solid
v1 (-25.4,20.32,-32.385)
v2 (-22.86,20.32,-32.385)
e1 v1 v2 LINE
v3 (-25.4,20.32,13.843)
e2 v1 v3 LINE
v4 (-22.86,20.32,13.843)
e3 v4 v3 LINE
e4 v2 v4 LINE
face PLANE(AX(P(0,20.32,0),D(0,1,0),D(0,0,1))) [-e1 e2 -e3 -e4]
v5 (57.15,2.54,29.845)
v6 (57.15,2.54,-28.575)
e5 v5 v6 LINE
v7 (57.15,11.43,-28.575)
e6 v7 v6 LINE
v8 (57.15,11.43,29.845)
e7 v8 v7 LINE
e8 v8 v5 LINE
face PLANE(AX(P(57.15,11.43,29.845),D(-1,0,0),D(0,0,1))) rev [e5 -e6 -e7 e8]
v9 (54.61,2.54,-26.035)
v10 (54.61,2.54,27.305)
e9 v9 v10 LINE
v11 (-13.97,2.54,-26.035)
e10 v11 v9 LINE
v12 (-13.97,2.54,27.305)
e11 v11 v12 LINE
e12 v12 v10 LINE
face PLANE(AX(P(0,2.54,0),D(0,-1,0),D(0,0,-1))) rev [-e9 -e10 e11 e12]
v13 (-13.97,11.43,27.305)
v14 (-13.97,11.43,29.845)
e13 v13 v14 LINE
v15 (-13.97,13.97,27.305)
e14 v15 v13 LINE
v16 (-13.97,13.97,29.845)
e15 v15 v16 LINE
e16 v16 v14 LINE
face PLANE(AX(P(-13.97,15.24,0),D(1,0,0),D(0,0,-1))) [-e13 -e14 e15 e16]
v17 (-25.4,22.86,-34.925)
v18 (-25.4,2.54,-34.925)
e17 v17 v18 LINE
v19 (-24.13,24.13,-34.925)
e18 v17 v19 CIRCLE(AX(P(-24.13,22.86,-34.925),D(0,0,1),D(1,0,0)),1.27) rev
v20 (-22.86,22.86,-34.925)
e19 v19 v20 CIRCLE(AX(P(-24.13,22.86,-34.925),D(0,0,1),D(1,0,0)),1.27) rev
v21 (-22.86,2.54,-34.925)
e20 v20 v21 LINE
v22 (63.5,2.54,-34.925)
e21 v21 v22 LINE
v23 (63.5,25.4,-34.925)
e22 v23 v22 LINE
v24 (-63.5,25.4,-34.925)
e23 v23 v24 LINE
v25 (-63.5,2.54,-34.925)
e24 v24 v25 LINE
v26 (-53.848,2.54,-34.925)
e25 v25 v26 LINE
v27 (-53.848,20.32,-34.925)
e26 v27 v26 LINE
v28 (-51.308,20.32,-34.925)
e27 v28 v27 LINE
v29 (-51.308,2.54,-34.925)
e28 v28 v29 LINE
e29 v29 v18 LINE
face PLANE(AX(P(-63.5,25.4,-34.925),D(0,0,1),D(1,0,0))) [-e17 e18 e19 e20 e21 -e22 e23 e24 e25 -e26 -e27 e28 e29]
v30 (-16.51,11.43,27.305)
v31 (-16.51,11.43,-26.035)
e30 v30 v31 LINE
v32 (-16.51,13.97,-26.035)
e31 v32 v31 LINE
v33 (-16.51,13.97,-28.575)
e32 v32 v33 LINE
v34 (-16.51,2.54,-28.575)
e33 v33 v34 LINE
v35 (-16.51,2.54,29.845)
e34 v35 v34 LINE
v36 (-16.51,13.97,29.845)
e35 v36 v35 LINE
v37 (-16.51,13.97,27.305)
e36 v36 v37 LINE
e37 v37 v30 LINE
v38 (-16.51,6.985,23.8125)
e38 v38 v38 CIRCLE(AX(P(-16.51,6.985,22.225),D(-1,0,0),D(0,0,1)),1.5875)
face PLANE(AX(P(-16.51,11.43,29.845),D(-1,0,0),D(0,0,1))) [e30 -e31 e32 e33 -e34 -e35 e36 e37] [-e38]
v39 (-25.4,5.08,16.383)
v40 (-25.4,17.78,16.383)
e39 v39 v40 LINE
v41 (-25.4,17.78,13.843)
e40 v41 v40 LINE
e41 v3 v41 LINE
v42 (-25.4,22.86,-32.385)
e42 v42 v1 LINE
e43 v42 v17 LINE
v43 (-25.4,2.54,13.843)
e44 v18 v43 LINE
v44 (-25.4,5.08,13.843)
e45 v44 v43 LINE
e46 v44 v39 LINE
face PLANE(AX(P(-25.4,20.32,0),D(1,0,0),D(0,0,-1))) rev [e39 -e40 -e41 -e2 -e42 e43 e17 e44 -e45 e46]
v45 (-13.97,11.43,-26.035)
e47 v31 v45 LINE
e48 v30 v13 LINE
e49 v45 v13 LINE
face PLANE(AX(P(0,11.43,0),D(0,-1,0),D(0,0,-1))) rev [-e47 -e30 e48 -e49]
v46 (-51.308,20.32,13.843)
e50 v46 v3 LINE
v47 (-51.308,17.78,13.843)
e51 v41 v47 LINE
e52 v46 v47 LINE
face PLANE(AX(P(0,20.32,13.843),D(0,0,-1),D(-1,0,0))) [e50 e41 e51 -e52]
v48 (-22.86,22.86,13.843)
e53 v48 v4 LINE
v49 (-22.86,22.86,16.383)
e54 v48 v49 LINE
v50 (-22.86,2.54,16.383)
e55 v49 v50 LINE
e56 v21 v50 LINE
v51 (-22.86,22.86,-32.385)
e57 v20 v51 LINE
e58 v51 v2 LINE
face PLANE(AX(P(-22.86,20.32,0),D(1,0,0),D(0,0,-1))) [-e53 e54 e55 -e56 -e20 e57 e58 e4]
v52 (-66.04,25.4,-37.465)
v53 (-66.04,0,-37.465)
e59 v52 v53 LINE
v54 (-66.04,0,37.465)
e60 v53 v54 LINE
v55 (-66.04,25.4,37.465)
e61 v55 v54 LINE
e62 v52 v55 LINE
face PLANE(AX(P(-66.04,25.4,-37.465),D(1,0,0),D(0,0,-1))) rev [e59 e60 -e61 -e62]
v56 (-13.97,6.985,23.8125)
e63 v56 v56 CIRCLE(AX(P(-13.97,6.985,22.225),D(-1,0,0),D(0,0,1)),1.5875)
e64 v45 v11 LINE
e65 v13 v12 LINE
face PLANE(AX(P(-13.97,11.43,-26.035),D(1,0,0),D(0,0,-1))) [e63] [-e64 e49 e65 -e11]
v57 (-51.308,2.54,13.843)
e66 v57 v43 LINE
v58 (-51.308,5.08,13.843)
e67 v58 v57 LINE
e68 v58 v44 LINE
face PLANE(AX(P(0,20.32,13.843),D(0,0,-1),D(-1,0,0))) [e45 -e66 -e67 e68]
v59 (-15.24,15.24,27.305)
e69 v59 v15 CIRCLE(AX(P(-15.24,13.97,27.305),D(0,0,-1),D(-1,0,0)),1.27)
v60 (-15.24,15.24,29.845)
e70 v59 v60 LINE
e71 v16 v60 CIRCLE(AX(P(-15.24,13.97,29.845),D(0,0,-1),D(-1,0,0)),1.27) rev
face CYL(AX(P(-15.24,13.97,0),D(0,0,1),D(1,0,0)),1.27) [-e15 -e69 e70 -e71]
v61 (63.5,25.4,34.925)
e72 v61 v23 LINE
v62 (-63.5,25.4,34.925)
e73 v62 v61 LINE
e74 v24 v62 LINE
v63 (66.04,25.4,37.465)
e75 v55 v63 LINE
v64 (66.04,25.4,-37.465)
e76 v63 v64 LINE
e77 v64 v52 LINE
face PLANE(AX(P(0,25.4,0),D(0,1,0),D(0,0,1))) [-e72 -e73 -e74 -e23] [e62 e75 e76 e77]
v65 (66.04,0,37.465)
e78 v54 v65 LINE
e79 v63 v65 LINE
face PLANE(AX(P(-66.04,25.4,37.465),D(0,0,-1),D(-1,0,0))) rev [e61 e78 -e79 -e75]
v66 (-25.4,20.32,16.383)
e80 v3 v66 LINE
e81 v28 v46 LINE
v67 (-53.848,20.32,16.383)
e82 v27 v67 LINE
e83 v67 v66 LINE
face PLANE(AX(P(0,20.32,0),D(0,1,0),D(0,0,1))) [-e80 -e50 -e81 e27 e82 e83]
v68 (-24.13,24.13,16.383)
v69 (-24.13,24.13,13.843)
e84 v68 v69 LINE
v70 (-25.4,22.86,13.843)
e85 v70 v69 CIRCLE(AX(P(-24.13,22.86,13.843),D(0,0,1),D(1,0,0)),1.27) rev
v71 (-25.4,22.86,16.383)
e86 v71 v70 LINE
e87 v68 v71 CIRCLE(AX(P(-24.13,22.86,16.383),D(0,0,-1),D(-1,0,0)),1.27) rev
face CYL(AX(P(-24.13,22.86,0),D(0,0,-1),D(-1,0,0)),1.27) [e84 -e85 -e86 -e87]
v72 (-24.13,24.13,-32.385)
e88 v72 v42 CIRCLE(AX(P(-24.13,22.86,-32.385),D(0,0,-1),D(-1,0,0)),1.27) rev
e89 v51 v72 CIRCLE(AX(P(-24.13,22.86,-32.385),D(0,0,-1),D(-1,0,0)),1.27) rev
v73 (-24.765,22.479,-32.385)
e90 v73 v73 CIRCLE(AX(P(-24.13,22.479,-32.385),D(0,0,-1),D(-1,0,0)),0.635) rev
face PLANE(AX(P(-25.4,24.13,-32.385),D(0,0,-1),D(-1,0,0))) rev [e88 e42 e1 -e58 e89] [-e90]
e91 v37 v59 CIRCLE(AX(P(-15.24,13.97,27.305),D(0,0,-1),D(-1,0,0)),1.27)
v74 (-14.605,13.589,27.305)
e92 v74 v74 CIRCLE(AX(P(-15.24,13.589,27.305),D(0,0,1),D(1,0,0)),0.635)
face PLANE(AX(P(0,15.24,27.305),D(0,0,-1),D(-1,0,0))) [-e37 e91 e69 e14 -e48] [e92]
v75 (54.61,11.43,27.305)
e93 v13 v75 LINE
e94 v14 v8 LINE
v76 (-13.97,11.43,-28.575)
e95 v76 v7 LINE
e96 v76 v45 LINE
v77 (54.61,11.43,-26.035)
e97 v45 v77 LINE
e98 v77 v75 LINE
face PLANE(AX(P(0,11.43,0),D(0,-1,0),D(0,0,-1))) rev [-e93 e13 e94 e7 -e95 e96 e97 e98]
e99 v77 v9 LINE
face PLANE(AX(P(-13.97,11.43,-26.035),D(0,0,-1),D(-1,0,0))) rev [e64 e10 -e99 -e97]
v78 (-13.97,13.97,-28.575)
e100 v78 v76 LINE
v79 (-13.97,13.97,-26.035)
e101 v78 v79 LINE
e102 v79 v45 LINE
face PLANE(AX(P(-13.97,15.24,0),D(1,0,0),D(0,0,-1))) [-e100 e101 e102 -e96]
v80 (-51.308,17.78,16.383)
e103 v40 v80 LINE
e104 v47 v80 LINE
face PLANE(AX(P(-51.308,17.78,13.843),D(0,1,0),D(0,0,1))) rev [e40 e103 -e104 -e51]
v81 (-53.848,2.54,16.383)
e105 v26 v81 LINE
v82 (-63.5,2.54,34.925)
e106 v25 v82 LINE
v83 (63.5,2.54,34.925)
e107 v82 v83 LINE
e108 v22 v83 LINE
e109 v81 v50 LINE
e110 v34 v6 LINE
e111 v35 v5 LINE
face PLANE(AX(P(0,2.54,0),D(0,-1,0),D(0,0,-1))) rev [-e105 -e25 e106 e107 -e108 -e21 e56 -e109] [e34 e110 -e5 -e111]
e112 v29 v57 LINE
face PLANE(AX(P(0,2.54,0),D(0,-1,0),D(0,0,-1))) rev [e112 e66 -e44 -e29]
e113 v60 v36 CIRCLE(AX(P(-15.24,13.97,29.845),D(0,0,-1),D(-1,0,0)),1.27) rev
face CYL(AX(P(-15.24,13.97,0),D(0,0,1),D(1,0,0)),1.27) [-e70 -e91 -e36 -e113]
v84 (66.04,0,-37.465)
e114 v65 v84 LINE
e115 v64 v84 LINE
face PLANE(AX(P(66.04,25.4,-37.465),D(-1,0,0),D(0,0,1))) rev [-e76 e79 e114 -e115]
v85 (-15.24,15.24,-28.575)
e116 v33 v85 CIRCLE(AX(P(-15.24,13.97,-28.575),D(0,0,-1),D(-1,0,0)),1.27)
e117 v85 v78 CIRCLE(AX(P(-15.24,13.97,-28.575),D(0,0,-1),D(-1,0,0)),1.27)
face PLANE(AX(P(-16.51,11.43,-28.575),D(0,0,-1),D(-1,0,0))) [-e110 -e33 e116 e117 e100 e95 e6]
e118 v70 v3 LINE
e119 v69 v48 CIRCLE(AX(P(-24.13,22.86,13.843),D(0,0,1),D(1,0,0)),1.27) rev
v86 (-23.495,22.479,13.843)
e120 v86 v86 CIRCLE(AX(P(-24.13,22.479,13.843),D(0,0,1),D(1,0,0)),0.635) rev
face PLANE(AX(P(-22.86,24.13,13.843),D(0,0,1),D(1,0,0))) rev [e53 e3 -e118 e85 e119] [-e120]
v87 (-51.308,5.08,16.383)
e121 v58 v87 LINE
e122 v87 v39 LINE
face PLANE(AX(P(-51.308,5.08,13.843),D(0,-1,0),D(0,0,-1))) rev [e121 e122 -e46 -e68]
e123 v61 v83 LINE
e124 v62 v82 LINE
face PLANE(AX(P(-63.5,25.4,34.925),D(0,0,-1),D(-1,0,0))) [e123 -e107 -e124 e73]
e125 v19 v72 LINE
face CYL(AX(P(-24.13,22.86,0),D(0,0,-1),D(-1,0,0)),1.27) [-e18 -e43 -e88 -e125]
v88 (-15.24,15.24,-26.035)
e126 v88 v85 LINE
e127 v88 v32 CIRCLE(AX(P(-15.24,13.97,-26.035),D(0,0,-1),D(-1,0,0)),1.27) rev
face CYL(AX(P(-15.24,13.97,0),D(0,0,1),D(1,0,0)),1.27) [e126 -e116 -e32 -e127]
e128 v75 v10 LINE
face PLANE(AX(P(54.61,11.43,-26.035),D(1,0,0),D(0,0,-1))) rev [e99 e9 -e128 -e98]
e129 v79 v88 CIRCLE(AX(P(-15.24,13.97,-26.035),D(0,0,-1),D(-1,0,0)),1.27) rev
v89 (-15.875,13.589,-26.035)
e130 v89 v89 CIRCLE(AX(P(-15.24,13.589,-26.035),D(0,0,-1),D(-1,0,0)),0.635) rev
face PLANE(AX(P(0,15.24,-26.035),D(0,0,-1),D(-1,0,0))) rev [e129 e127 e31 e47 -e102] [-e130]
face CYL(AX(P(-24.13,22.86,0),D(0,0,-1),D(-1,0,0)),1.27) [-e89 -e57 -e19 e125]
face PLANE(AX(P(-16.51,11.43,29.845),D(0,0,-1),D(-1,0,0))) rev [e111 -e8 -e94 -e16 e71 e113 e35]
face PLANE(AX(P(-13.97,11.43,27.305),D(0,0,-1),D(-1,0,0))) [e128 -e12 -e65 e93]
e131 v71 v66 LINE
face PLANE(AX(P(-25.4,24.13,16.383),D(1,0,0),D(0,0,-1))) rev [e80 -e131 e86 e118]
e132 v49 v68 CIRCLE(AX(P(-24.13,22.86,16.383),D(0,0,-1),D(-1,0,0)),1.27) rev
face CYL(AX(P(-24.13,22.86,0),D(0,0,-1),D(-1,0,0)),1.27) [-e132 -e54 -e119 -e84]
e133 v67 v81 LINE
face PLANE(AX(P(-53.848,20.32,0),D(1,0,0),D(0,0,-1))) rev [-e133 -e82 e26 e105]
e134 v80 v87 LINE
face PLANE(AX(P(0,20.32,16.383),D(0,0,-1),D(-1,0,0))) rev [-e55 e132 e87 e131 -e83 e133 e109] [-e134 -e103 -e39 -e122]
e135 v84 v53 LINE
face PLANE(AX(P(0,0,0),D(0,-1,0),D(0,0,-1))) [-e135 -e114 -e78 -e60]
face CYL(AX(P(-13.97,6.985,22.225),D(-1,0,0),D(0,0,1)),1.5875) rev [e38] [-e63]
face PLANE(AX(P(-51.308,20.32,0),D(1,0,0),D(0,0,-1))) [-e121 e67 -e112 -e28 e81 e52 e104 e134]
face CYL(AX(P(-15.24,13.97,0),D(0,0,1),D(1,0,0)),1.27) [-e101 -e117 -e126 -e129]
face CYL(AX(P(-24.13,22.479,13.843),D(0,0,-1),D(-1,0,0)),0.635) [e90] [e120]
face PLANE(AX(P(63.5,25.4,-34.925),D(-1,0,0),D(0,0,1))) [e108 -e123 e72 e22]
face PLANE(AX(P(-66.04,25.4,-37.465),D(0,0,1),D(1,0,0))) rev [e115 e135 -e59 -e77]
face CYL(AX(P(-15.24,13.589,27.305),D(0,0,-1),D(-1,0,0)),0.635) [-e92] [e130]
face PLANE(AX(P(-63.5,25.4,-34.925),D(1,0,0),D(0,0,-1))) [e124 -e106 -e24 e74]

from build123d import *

# Parameters (mm, degrees)
SKETCH1_W              = 127
SKETCH1_H              = 69.85
BASE_DEPTH             = 2.54
SKETCH2_W              = 73.66
SKETCH2_H              = 58.42
SKETCH2_W_2            = 68.58
SKETCH2_H_2            = 53.34
PCB_HOLDER_DEPTH       = 8.89
SKETCH1_3_W            = 132.08
SKETCH1_3_H            = 74.93
SKETCH1_3_W_2          = 127
SKETCH1_3_H_2          = 69.85
BOSS_EXTRUDE5_DEPTH    = 25.4
BOSS_EXTRUDE6_DEPTH    = 17.78
SKETCH7_W              = 25.908
SKETCH7_H              = 12.7
BATTERY_GAP_DEPTH      = 2.54
SKETCH4_R              = 1.5875
WIRE_GAP_DEPTH         = 2.54
SKETCH8_W              = 2.54
SKETCH8_H              = 2.54
PCB_HOLDER_HINGE_DEPTH = 3.81
FILLET4_R              = 1.27
SKETCH13_R             = 0.635
BOSS_EXTRUDE10_DEPTH   = 53.34
SKETCH14_W             = 2.54
SKETCH14_H             = 2.54
BOSS_EXTRUDE11_DEPTH   = 3.81
FILLET5_R              = 1.27
SKETCH15_R             = 0.635
BOSS_EXTRUDE13_DEPTH   = 46.228


with BuildPart() as part:
    # Sketch1 → Base (new body)
    with BuildSketch(Plane(origin=(0, 0, 0), x_dir=(1, 0, 0), z_dir=(0, 1, 0))):
        Rectangle(SKETCH1_W, SKETCH1_H)
    extrude(amount=BASE_DEPTH)

    # Sketch2 → PCB-Holder (add)
    with BuildSketch(Plane(origin=(0, 2.54, 0), x_dir=(1, 0, 0), z_dir=(0, 1, 0))):
        with Locations((20.32, -0.635)):
            Rectangle(SKETCH2_W, SKETCH2_H)
        with Locations((20.32, -0.635)):
            Rectangle(SKETCH2_W_2, SKETCH2_H_2, mode=Mode.SUBTRACT)
    extrude(amount=PCB_HOLDER_DEPTH)

    # Sketch1<3> → Boss-Extrude5 (add)
    with BuildSketch(Plane(origin=(0, 0, 0), x_dir=(1, 0, 0), z_dir=(0, 1, 0))):
        Rectangle(SKETCH1_3_W, SKETCH1_3_H)
        Rectangle(SKETCH1_3_W_2, SKETCH1_3_H_2, mode=Mode.SUBTRACT)
    extrude(amount=BOSS_EXTRUDE5_DEPTH)

    # Sketch6 → Boss-Extrude6 (add)
    with BuildSketch(Plane(origin=(0, 2.54, 0), x_dir=(1, 0, 0), z_dir=(0, 1, 0))):
        Polygon((-51.308, -13.843), (-51.308, 34.925), (-53.848, 34.925), (-53.848, -16.383), (-22.86, -16.383), (-22.86, 34.925), (-25.4, 34.925), (-25.4, -13.843), align=None)
    extrude(amount=BOSS_EXTRUDE6_DEPTH)

    # Sketch7 → Battery-Gap (cut)
    with BuildSketch(Plane.XY.offset(16.383)):
        with Locations((-38.354, 11.43)):
            Rectangle(SKETCH7_W, SKETCH7_H)
    extrude(amount=-BATTERY_GAP_DEPTH, mode=Mode.SUBTRACT)

    # Sketch4 → Wire-Gap (cut)
    with BuildSketch(Plane.ZY.offset(16.51)):
        with Locations((22.225, 6.985)):
            Circle(SKETCH4_R)
    extrude(amount=-WIRE_GAP_DEPTH, mode=Mode.SUBTRACT)

    # Sketch8 → PCB-Holder-Hinge (add)
    with BuildSketch(Plane(origin=(0, 11.43, 0), x_dir=(1, 0, 0), z_dir=(0, 1, 0))):
        with Locations((-15.24, -28.575)):
            Rectangle(SKETCH8_W, SKETCH8_H)
        with Locations((-15.24, 27.305)):
            Rectangle(SKETCH8_W, SKETCH8_H)
    extrude(amount=PCB_HOLDER_HINGE_DEPTH)

    # Fillet4
    fillet4_edges = [part.edges().sort_by_distance(p)[0] for p in [
        (-16.51, 15.24, -27.305),
        (-13.97, 15.24, -27.305),
        (-13.97, 15.24, 28.575),
        (-16.51, 15.24, 28.575),
    ]]
    fillet(fillet4_edges, radius=FILLET4_R - 0.0001)  # a hair under: the kernel refuses the full size

    # Sketch13 → Boss-Extrude10 (add)
    with BuildSketch(Plane.XY.offset(-26.035)):
        with Locations(Location((-15.24, 13.589, 0), (0, 0, 180))):
            Circle(SKETCH13_R)
    extrude(amount=BOSS_EXTRUDE10_DEPTH)

    # Sketch14 → Boss-Extrude11 (add)
    with BuildSketch(Plane(origin=(0, 20.32, 0), x_dir=(1, 0, 0), z_dir=(0, 1, 0))):
        with Locations((-24.13, -15.113)):
            Rectangle(SKETCH14_W, SKETCH14_H)
        with Locations((-24.13, 33.655)):
            Rectangle(SKETCH14_W, SKETCH14_H)
    extrude(amount=BOSS_EXTRUDE11_DEPTH)

    # Fillet5
    fillet5_edges = [part.edges().sort_by_distance(p)[0] for p in [
        (-22.86, 24.13, -33.655),
        (-25.4, 24.13, -33.655),
        (-25.4, 24.13, 15.113),
        (-22.86, 24.13, 15.113),
    ]]
    fillet(fillet5_edges, radius=FILLET5_R - 0.0001)  # a hair under: the kernel refuses the full size

    # Sketch15 → Boss-Extrude13 (add)
    with BuildSketch(Plane.XY.offset(-32.385)):
        with Locations(Location((-24.13, 22.479, 0), (0, 0, 180))):
            Circle(SKETCH15_R)
    extrude(amount=BOSS_EXTRUDE13_DEPTH)


solid = part.part
